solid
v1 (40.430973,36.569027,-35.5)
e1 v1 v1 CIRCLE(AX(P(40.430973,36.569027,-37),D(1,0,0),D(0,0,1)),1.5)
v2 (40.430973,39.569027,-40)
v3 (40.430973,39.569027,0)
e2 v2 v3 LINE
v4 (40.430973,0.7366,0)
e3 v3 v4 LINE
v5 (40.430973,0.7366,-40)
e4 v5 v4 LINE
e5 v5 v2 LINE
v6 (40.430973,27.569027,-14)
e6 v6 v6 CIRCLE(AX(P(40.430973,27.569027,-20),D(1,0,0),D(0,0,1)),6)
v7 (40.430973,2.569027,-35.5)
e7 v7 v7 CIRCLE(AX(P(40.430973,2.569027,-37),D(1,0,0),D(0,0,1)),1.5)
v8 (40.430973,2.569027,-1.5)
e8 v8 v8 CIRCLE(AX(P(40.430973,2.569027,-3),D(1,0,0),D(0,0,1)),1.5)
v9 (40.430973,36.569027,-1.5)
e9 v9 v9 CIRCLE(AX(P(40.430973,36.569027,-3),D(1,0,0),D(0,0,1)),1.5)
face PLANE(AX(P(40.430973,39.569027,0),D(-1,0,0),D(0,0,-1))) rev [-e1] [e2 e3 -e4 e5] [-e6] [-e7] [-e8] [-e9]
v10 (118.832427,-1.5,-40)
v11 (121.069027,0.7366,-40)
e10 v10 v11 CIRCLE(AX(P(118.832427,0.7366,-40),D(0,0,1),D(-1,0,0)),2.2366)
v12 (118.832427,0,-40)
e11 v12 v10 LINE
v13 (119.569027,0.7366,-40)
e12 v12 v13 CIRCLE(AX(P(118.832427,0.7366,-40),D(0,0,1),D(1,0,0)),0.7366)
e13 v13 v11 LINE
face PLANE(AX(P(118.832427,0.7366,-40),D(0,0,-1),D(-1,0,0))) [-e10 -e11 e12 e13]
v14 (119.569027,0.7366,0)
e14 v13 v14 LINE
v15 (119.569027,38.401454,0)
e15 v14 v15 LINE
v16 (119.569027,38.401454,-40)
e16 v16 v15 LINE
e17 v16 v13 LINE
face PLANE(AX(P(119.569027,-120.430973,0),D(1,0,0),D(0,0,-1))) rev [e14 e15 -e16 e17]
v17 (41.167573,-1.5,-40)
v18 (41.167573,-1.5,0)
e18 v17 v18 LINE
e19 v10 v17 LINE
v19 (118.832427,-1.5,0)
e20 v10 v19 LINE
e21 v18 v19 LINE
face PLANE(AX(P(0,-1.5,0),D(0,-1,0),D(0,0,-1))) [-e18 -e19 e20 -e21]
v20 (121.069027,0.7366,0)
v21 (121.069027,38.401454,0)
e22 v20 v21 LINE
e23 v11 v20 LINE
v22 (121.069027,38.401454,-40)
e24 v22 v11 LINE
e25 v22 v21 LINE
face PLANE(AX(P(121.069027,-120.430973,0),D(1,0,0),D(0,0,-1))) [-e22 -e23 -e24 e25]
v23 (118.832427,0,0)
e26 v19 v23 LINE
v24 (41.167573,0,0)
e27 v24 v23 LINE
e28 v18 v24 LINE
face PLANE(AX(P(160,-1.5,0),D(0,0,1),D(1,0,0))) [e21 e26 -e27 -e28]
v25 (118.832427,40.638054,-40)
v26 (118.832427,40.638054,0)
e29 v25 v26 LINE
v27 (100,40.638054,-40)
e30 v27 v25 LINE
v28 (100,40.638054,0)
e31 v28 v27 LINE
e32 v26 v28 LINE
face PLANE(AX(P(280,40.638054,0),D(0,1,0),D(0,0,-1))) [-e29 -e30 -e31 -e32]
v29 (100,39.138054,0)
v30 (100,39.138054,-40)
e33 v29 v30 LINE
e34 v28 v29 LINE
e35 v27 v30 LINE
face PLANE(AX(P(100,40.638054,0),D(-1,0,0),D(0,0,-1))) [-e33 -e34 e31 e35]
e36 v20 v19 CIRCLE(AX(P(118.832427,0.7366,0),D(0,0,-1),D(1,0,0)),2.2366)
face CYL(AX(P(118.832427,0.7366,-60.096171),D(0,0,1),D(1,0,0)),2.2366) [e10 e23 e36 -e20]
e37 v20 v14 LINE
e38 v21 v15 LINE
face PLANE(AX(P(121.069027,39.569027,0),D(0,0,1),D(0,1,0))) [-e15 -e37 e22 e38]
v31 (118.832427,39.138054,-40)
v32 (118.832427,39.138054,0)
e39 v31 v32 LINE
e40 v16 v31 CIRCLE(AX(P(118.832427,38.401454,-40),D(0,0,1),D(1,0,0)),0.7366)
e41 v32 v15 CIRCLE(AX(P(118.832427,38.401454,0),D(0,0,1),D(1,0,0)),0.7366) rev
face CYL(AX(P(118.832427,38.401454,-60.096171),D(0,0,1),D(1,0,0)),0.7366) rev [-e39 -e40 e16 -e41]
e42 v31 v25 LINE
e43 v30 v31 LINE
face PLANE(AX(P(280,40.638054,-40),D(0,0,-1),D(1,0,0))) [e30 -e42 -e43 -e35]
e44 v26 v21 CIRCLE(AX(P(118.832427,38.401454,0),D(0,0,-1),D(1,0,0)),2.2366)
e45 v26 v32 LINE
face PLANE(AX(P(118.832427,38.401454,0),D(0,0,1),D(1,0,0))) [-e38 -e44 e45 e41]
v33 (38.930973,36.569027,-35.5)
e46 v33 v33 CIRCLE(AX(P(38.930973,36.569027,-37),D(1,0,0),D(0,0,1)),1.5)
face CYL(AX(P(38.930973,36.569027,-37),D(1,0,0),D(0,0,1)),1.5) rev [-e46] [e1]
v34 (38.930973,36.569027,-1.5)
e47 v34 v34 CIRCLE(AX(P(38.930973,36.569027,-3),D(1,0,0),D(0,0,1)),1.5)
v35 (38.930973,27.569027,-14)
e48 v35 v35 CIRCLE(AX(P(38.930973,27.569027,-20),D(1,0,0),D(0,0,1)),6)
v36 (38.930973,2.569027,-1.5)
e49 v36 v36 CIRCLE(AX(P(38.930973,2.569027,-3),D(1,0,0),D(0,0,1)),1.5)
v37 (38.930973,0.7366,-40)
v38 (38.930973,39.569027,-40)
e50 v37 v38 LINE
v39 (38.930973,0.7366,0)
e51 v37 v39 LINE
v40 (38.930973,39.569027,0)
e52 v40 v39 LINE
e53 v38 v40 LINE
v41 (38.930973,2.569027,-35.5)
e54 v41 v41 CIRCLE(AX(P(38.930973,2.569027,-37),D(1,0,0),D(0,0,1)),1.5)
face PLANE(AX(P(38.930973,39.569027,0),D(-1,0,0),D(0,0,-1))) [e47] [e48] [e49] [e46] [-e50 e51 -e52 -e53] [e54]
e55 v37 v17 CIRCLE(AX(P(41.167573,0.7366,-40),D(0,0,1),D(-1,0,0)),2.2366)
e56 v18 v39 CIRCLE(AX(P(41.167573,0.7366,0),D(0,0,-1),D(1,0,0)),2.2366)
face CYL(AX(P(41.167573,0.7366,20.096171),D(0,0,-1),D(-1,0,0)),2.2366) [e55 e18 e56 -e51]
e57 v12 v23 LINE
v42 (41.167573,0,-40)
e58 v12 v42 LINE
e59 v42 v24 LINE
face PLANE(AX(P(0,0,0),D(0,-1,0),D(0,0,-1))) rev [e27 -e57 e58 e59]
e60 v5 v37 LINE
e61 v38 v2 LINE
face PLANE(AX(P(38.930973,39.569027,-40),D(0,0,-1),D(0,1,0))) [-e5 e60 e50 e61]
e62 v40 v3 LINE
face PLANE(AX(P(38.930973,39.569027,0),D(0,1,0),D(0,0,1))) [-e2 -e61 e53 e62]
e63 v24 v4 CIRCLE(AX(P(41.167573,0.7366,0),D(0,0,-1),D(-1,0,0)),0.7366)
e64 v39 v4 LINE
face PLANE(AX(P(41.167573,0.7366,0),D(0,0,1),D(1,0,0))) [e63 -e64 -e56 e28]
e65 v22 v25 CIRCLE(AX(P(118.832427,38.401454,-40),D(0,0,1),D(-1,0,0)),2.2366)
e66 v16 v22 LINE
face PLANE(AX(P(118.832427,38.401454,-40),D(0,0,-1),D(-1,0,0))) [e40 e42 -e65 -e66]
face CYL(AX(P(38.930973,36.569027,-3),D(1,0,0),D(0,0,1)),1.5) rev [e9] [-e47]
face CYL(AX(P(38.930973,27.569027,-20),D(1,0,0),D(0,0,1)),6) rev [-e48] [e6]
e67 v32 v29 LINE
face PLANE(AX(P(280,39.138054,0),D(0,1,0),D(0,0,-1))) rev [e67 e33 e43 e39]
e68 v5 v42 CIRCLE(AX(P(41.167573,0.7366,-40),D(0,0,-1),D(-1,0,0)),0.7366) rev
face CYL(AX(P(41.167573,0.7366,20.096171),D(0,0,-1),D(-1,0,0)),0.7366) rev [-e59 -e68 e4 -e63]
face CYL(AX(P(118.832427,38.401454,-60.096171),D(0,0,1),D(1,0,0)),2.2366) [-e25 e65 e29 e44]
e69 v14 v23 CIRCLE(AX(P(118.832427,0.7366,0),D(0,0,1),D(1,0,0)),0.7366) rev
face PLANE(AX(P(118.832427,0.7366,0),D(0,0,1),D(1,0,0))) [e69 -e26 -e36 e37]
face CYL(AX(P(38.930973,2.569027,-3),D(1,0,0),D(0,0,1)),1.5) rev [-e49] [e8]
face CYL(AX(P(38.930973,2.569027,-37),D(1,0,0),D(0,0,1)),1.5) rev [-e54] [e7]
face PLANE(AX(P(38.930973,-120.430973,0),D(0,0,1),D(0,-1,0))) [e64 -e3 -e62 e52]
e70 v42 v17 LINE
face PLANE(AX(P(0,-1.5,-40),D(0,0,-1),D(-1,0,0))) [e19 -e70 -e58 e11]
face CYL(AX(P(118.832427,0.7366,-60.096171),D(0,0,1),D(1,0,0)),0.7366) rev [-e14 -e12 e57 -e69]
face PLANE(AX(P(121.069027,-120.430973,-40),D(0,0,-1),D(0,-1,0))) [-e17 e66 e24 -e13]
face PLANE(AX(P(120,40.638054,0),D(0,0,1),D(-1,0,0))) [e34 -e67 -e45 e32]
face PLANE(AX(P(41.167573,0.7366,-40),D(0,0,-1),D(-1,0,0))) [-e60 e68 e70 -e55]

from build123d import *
from build123d.topology import SkipClean

# Parameters (mm, degrees)
SKETCH1_R               = 6
SKETCH1_R_2             = 1.5
BASE_FLANGE2_DEPTH      = 1.5
SKETCHED_START          = -40
SKETCHED_BEND1_DEPTH    = 40
SKETCHED_BEND1_2_DEPTH  = 40
SKETCHED_START_2        = -35.4999999
SKETCHED_BEND1_3_DEPTH  = 9.4999998
SKETCHED_START_3        = -13.9999999
SKETCHED_BEND1_4_DEPTH  = 9.4999998
SKETCHED_BEND1_5_DEPTH  = 1.4999999
SKETCHED_START_4        = -1.4999999
SKETCHED_BEND1_6_DEPTH  = 1.4999999
SKETCHED_START_5        = 38.93097291
SKETCHED_BEND1_7_DEPTH  = 1.5
SKETCHED_START_6        = 40.43097291
SKETCHED_BEND1_8_DEPTH  = 0.618240168
SKETCHED_START_7        = -38.5000001
SKETCHED_BEND1_9_DEPTH  = 37.00000011
SKETCHED_BEND1_10_DEPTH = 37.00000011


with BuildPart() as part:
    # Base-Flange2: sheet metal written as solids
    # Sketch1 → Base-Flange2 (new body)
    with BuildSketch(Plane(origin=(0, 0, 0), x_dir=(1, 0, 0), z_dir=(0, 1, 0))):
        Polygon((0, 0), (40, 0), (120, 0), (160, 0), (180, 0), (180, 40), (160, 40), (120, 40), (40, 40), (0, 40), align=None)
        with Locations(Location((12, 20, 0), (0, 0, 270))):
            Circle(SKETCH1_R, mode=Mode.SUBTRACT)
        with Locations(Location((3, 37, 0), (0, 0, 270))):
            Circle(SKETCH1_R_2, mode=Mode.SUBTRACT)
        with Locations(Location((37, 37, 0), (0, 0, 270))):
            Circle(SKETCH1_R_2, mode=Mode.SUBTRACT)
        with Locations(Location((37, 3, 0), (0, 0, 270))):
            Circle(SKETCH1_R_2, mode=Mode.SUBTRACT)
        with Locations(Location((3, 3, 0), (0, 0, 270))):
            Circle(SKETCH1_R_2, mode=Mode.SUBTRACT)
    extrude(amount=-BASE_FLANGE2_DEPTH)

    # Sketched Bend1: read off the stored shape, not the designer's step
    # Sketched Bend1 outline → Sketched Bend1 (cut)
    with BuildSketch(Plane.XY.offset(SKETCHED_START)):
        with BuildLine():
            Line((180, 0), (120.944250946, 0))
            ThreePointArc((120.944250946, 0), (120.127591172, -1.086838938), (118.83242709, -1.5))
            Line((118.83242709, -1.5), (180, -1.5))
            Line((180, -1.5), (180, 0))
        make_face()
        with BuildLine():
            Line((0, -1.5), (41.16757291, -1.5))
            ThreePointArc((41.16757291, -1.5), (39.872408828, -1.086838938), (39.055749054, 0))
            Line((39.055749054, 0), (0, 0))
            Line((0, 0), (0, -1.5))
        make_face()
    extrude(amount=SKETCHED_BEND1_DEPTH, mode=Mode.SUBTRACT)

    # Sketched Bend1 2 outline → Sketched Bend1 2 (add)
    with BuildSketch(Plane.XY.offset(SKETCHED_START)):
        with BuildLine():
            ThreePointArc((120.944250946, 0), (121.037612433, 0.363053267), (121.06902709, 0.7366))
            Line((121.06902709, 0.7366), (121.06902709, 38.401454181))
            ThreePointArc((121.06902709, 38.401454181), (120.413942116, 39.982969207), (118.83242709, 40.638054181))
            Line((118.83242709, 40.638054181), (100, 40.638054181))
            Line((100, 40.638054181), (100, 39.138054181))
            Line((100, 39.138054181), (118.83242709, 39.138054181))
            ThreePointArc((118.83242709, 39.138054181), (119.353281945, 38.922309036), (119.56902709, 38.401454181))
            Line((119.56902709, 38.401454181), (119.56902709, 0.7366))
            ThreePointArc((119.56902709, 0.7366), (119.353281945, 0.215745145), (118.83242709, 0))
            Line((118.83242709, 0), (120.944250946, 0))
        make_face()
    extrude(amount=SKETCHED_BEND1_2_DEPTH)

    # Sketched Bend1 3 outline → Sketched Bend1 3 (add)
    with BuildSketch(Plane.XY.offset(SKETCHED_START_2)):
        with BuildLine():
            Line((39.055749054, 0), (41.16757291, 0))
            ThreePointArc((41.16757291, 0), (40.646718055, 0.215745145), (40.43097291, 0.7366))
            Line((40.43097291, 0.7366), (40.43097291, 39.56902709))
            Line((40.43097291, 39.56902709), (38.93097291, 39.56902709))
            Line((38.93097291, 39.56902709), (38.93097291, 0.7366))
            ThreePointArc((38.93097291, 0.7366), (38.962387567, 0.363053267), (39.055749054, 0))
        make_face()
    extrude(amount=SKETCHED_BEND1_3_DEPTH)

    # Sketched Bend1 4 outline → Sketched Bend1 4 (add)
    with BuildSketch(Plane.XY.offset(SKETCHED_START_3)):
        with BuildLine():
            Line((39.055749054, 0), (41.16757291, 0))
            ThreePointArc((41.16757291, 0), (40.646718055, 0.215745145), (40.43097291, 0.7366))
            Line((40.43097291, 0.7366), (40.43097291, 39.56902709))
            Line((40.43097291, 39.56902709), (38.93097291, 39.56902709))
            Line((38.93097291, 39.56902709), (38.93097291, 0.7366))
            ThreePointArc((38.93097291, 0.7366), (38.962387567, 0.363053267), (39.055749054, 0))
        make_face()
    extrude(amount=SKETCHED_BEND1_4_DEPTH)

    # Sketched Bend1 5 outline → Sketched Bend1 5 (add)
    with BuildSketch(Plane.XY.offset(SKETCHED_START)):
        with BuildLine():
            Line((39.055749054, 0), (41.16757291, 0))
            ThreePointArc((41.16757291, 0), (40.646718055, 0.215745145), (40.43097291, 0.7366))
            Line((40.43097291, 0.7366), (40.43097291, 39.56902709))
            Line((40.43097291, 39.56902709), (38.93097291, 39.56902709))
            Line((38.93097291, 39.56902709), (38.93097291, 0.7366))
            ThreePointArc((38.93097291, 0.7366), (38.962387567, 0.363053267), (39.055749054, 0))
        make_face()
    extrude(amount=SKETCHED_BEND1_5_DEPTH)

    # Sketched Bend1 6 outline → Sketched Bend1 6 (add)
    with BuildSketch(Plane.XY.offset(SKETCHED_START_4)):
        with BuildLine():
            Line((39.055749054, 0), (41.16757291, 0))
            ThreePointArc((41.16757291, 0), (40.646718055, 0.215745145), (40.43097291, 0.7366))
            Line((40.43097291, 0.7366), (40.43097291, 39.56902709))
            Line((40.43097291, 39.56902709), (38.93097291, 39.56902709))
            Line((38.93097291, 39.56902709), (38.93097291, 0.7366))
            ThreePointArc((38.93097291, 0.7366), (38.962387567, 0.363053267), (39.055749054, 0))
        make_face()
    extrude(amount=SKETCHED_BEND1_6_DEPTH)

    # Sketched Bend1 7 outline → Sketched Bend1 7 (add)
    with BuildSketch(Plane.YZ.offset(SKETCHED_START_5)):
        with BuildLine():
            Line((36.56902709, -38.5), (39.56902709, -38.5000001))
            Line((39.56902709, -38.5000001), (39.56902709, -35.4999999))
            Line((39.56902709, -35.4999999), (36.56902709, -35.5))
            ThreePointArc((36.56902709, -35.5), (38.06902709, -37), (36.56902709, -38.5))
        make_face()
        with BuildLine():
            Line((2.569027031, -38.5), (36.56902709, -38.5))
            ThreePointArc((36.56902709, -38.5), (35.06902709, -37), (36.56902709, -35.5))
            Line((36.56902709, -35.5), (2.56902709, -35.5))
            ThreePointArc((2.56902709, -35.5), (4.06902709, -37.000000029), (2.569027031, -38.5))
        make_face()
        with BuildLine():
            Line((27.56902709, -26), (39.56902709, -26.0000001))
            Line((39.56902709, -26.0000001), (39.56902709, -13.9999999))
            Line((39.56902709, -13.9999999), (27.56902709, -14))
            ThreePointArc((27.56902709, -14), (33.56902709, -20), (27.56902709, -26))
        make_face()
        with BuildLine():
            Line((0, -38.5000001), (2.569027031, -38.5))
            ThreePointArc((2.569027031, -38.5), (1.06902709, -36.999999971), (2.56902709, -35.5))
            Line((2.56902709, -35.5), (0, -35.4999999))
            Line((0, -35.4999999), (0, -38.5000001))
        make_face()
        with BuildLine():
            Line((0, -26.0000001), (27.56902709, -26))
            ThreePointArc((27.56902709, -26), (21.56902709, -20), (27.56902709, -14))
            Line((27.56902709, -14), (0, -13.9999999))
            Line((0, -13.9999999), (0, -26.0000001))
        make_face()
        with BuildLine():
            Line((36.56902709, -4.5), (39.56902709, -4.5000001))
            Line((39.56902709, -4.5000001), (39.56902709, -1.4999999))
            Line((39.56902709, -1.4999999), (36.56902709, -1.5))
            ThreePointArc((36.56902709, -1.5), (38.06902709, -3), (36.56902709, -4.5))
        make_face()
        with BuildLine():
            Line((2.56902709, -4.5), (36.56902709, -4.5))
            ThreePointArc((36.56902709, -4.5), (35.06902709, -3), (36.56902709, -1.5))
            Line((36.56902709, -1.5), (2.569027095, -1.5))
            ThreePointArc((2.569027095, -1.5), (4.06902709, -3.000000002), (2.56902709, -4.5))
        make_face()
        with BuildLine():
            Line((0, -4.5000001), (2.56902709, -4.5))
            ThreePointArc((2.56902709, -4.5), (1.06902709, -2.999999998), (2.569027095, -1.5))
            Line((2.569027095, -1.5), (0, -1.4999999))
            Line((0, -1.4999999), (0, -4.5000001))
        make_face()
    extrude(amount=SKETCHED_BEND1_7_DEPTH)

    # Sketched Bend1 8 outline → Sketched Bend1 8 (add)
    with BuildSketch(Plane.YZ.offset(SKETCHED_START_6)):
        with BuildLine():
            Line((0, -38.5000001), (2.569027031, -38.5))
            ThreePointArc((2.569027031, -38.5), (1.06902709, -36.999999971), (2.56902709, -35.5))
            Line((2.56902709, -35.5), (0, -35.4999999))
            Line((0, -35.4999999), (0, -38.5000001))
        make_face()
        with BuildLine():
            Line((0, -26.0000001), (27.56902709, -26))
            ThreePointArc((27.56902709, -26), (21.56902709, -20), (27.56902709, -14))
            Line((27.56902709, -14), (0, -13.9999999))
            Line((0, -13.9999999), (0, -26.0000001))
        make_face()
        with BuildLine():
            Line((0, -4.5000001), (2.56902709, -4.5))
            ThreePointArc((2.56902709, -4.5), (1.06902709, -2.999999998), (2.569027095, -1.5))
            Line((2.569027095, -1.5), (0, -1.4999999))
            Line((0, -1.4999999), (0, -4.5000001))
        make_face()
    extrude(amount=SKETCHED_BEND1_8_DEPTH)

    # Sketched Bend1 9 outline → Sketched Bend1 9 (cut)
    with SkipClean():  # the faces are left unmerged after this step: merging them gives an invalid solid
        with BuildSketch(Plane.XY.offset(SKETCHED_START_7)):
            with BuildLine():
                ThreePointArc((40.43097291, 0.7366), (40.606429696, 0.259423037), (41.049213078, 0.009571452))
                Line((41.049213078, 0.009571452), (41.049213078, 27.56902709))
                Line((41.049213078, 27.56902709), (40.43097291, 27.56902709))
                Line((40.43097291, 27.56902709), (40.43097291, 0.7366))
            make_face()
            with BuildLine():
                ThreePointArc((39.055749054, 0), (38.962387567, 0.363053267), (38.93097291, 0.7366))
                Line((38.93097291, 0.7366), (38.93097291, 0))
                Line((38.93097291, 0), (39.055749054, 0))
            make_face()
        extrude(amount=SKETCHED_BEND1_9_DEPTH, mode=Mode.SUBTRACT)

    # Sketched Bend1 10 outline → Sketched Bend1 10 (add)
    with SkipClean():  # the faces are left unmerged after this step: merging them gives an invalid solid
        with BuildSketch(Plane.XY.offset(SKETCHED_START_7)):
            with BuildLine():
                ThreePointArc((41.16757291, 0), (41.108199805, 0.002396762), (41.049213078, 0.009571452))
                Line((41.049213078, 0.009571452), (41.049213078, 0))
                Line((41.049213078, 0), (41.16757291, 0))
            make_face()
        extrude(amount=SKETCHED_BEND1_10_DEPTH)


solid = part.part
